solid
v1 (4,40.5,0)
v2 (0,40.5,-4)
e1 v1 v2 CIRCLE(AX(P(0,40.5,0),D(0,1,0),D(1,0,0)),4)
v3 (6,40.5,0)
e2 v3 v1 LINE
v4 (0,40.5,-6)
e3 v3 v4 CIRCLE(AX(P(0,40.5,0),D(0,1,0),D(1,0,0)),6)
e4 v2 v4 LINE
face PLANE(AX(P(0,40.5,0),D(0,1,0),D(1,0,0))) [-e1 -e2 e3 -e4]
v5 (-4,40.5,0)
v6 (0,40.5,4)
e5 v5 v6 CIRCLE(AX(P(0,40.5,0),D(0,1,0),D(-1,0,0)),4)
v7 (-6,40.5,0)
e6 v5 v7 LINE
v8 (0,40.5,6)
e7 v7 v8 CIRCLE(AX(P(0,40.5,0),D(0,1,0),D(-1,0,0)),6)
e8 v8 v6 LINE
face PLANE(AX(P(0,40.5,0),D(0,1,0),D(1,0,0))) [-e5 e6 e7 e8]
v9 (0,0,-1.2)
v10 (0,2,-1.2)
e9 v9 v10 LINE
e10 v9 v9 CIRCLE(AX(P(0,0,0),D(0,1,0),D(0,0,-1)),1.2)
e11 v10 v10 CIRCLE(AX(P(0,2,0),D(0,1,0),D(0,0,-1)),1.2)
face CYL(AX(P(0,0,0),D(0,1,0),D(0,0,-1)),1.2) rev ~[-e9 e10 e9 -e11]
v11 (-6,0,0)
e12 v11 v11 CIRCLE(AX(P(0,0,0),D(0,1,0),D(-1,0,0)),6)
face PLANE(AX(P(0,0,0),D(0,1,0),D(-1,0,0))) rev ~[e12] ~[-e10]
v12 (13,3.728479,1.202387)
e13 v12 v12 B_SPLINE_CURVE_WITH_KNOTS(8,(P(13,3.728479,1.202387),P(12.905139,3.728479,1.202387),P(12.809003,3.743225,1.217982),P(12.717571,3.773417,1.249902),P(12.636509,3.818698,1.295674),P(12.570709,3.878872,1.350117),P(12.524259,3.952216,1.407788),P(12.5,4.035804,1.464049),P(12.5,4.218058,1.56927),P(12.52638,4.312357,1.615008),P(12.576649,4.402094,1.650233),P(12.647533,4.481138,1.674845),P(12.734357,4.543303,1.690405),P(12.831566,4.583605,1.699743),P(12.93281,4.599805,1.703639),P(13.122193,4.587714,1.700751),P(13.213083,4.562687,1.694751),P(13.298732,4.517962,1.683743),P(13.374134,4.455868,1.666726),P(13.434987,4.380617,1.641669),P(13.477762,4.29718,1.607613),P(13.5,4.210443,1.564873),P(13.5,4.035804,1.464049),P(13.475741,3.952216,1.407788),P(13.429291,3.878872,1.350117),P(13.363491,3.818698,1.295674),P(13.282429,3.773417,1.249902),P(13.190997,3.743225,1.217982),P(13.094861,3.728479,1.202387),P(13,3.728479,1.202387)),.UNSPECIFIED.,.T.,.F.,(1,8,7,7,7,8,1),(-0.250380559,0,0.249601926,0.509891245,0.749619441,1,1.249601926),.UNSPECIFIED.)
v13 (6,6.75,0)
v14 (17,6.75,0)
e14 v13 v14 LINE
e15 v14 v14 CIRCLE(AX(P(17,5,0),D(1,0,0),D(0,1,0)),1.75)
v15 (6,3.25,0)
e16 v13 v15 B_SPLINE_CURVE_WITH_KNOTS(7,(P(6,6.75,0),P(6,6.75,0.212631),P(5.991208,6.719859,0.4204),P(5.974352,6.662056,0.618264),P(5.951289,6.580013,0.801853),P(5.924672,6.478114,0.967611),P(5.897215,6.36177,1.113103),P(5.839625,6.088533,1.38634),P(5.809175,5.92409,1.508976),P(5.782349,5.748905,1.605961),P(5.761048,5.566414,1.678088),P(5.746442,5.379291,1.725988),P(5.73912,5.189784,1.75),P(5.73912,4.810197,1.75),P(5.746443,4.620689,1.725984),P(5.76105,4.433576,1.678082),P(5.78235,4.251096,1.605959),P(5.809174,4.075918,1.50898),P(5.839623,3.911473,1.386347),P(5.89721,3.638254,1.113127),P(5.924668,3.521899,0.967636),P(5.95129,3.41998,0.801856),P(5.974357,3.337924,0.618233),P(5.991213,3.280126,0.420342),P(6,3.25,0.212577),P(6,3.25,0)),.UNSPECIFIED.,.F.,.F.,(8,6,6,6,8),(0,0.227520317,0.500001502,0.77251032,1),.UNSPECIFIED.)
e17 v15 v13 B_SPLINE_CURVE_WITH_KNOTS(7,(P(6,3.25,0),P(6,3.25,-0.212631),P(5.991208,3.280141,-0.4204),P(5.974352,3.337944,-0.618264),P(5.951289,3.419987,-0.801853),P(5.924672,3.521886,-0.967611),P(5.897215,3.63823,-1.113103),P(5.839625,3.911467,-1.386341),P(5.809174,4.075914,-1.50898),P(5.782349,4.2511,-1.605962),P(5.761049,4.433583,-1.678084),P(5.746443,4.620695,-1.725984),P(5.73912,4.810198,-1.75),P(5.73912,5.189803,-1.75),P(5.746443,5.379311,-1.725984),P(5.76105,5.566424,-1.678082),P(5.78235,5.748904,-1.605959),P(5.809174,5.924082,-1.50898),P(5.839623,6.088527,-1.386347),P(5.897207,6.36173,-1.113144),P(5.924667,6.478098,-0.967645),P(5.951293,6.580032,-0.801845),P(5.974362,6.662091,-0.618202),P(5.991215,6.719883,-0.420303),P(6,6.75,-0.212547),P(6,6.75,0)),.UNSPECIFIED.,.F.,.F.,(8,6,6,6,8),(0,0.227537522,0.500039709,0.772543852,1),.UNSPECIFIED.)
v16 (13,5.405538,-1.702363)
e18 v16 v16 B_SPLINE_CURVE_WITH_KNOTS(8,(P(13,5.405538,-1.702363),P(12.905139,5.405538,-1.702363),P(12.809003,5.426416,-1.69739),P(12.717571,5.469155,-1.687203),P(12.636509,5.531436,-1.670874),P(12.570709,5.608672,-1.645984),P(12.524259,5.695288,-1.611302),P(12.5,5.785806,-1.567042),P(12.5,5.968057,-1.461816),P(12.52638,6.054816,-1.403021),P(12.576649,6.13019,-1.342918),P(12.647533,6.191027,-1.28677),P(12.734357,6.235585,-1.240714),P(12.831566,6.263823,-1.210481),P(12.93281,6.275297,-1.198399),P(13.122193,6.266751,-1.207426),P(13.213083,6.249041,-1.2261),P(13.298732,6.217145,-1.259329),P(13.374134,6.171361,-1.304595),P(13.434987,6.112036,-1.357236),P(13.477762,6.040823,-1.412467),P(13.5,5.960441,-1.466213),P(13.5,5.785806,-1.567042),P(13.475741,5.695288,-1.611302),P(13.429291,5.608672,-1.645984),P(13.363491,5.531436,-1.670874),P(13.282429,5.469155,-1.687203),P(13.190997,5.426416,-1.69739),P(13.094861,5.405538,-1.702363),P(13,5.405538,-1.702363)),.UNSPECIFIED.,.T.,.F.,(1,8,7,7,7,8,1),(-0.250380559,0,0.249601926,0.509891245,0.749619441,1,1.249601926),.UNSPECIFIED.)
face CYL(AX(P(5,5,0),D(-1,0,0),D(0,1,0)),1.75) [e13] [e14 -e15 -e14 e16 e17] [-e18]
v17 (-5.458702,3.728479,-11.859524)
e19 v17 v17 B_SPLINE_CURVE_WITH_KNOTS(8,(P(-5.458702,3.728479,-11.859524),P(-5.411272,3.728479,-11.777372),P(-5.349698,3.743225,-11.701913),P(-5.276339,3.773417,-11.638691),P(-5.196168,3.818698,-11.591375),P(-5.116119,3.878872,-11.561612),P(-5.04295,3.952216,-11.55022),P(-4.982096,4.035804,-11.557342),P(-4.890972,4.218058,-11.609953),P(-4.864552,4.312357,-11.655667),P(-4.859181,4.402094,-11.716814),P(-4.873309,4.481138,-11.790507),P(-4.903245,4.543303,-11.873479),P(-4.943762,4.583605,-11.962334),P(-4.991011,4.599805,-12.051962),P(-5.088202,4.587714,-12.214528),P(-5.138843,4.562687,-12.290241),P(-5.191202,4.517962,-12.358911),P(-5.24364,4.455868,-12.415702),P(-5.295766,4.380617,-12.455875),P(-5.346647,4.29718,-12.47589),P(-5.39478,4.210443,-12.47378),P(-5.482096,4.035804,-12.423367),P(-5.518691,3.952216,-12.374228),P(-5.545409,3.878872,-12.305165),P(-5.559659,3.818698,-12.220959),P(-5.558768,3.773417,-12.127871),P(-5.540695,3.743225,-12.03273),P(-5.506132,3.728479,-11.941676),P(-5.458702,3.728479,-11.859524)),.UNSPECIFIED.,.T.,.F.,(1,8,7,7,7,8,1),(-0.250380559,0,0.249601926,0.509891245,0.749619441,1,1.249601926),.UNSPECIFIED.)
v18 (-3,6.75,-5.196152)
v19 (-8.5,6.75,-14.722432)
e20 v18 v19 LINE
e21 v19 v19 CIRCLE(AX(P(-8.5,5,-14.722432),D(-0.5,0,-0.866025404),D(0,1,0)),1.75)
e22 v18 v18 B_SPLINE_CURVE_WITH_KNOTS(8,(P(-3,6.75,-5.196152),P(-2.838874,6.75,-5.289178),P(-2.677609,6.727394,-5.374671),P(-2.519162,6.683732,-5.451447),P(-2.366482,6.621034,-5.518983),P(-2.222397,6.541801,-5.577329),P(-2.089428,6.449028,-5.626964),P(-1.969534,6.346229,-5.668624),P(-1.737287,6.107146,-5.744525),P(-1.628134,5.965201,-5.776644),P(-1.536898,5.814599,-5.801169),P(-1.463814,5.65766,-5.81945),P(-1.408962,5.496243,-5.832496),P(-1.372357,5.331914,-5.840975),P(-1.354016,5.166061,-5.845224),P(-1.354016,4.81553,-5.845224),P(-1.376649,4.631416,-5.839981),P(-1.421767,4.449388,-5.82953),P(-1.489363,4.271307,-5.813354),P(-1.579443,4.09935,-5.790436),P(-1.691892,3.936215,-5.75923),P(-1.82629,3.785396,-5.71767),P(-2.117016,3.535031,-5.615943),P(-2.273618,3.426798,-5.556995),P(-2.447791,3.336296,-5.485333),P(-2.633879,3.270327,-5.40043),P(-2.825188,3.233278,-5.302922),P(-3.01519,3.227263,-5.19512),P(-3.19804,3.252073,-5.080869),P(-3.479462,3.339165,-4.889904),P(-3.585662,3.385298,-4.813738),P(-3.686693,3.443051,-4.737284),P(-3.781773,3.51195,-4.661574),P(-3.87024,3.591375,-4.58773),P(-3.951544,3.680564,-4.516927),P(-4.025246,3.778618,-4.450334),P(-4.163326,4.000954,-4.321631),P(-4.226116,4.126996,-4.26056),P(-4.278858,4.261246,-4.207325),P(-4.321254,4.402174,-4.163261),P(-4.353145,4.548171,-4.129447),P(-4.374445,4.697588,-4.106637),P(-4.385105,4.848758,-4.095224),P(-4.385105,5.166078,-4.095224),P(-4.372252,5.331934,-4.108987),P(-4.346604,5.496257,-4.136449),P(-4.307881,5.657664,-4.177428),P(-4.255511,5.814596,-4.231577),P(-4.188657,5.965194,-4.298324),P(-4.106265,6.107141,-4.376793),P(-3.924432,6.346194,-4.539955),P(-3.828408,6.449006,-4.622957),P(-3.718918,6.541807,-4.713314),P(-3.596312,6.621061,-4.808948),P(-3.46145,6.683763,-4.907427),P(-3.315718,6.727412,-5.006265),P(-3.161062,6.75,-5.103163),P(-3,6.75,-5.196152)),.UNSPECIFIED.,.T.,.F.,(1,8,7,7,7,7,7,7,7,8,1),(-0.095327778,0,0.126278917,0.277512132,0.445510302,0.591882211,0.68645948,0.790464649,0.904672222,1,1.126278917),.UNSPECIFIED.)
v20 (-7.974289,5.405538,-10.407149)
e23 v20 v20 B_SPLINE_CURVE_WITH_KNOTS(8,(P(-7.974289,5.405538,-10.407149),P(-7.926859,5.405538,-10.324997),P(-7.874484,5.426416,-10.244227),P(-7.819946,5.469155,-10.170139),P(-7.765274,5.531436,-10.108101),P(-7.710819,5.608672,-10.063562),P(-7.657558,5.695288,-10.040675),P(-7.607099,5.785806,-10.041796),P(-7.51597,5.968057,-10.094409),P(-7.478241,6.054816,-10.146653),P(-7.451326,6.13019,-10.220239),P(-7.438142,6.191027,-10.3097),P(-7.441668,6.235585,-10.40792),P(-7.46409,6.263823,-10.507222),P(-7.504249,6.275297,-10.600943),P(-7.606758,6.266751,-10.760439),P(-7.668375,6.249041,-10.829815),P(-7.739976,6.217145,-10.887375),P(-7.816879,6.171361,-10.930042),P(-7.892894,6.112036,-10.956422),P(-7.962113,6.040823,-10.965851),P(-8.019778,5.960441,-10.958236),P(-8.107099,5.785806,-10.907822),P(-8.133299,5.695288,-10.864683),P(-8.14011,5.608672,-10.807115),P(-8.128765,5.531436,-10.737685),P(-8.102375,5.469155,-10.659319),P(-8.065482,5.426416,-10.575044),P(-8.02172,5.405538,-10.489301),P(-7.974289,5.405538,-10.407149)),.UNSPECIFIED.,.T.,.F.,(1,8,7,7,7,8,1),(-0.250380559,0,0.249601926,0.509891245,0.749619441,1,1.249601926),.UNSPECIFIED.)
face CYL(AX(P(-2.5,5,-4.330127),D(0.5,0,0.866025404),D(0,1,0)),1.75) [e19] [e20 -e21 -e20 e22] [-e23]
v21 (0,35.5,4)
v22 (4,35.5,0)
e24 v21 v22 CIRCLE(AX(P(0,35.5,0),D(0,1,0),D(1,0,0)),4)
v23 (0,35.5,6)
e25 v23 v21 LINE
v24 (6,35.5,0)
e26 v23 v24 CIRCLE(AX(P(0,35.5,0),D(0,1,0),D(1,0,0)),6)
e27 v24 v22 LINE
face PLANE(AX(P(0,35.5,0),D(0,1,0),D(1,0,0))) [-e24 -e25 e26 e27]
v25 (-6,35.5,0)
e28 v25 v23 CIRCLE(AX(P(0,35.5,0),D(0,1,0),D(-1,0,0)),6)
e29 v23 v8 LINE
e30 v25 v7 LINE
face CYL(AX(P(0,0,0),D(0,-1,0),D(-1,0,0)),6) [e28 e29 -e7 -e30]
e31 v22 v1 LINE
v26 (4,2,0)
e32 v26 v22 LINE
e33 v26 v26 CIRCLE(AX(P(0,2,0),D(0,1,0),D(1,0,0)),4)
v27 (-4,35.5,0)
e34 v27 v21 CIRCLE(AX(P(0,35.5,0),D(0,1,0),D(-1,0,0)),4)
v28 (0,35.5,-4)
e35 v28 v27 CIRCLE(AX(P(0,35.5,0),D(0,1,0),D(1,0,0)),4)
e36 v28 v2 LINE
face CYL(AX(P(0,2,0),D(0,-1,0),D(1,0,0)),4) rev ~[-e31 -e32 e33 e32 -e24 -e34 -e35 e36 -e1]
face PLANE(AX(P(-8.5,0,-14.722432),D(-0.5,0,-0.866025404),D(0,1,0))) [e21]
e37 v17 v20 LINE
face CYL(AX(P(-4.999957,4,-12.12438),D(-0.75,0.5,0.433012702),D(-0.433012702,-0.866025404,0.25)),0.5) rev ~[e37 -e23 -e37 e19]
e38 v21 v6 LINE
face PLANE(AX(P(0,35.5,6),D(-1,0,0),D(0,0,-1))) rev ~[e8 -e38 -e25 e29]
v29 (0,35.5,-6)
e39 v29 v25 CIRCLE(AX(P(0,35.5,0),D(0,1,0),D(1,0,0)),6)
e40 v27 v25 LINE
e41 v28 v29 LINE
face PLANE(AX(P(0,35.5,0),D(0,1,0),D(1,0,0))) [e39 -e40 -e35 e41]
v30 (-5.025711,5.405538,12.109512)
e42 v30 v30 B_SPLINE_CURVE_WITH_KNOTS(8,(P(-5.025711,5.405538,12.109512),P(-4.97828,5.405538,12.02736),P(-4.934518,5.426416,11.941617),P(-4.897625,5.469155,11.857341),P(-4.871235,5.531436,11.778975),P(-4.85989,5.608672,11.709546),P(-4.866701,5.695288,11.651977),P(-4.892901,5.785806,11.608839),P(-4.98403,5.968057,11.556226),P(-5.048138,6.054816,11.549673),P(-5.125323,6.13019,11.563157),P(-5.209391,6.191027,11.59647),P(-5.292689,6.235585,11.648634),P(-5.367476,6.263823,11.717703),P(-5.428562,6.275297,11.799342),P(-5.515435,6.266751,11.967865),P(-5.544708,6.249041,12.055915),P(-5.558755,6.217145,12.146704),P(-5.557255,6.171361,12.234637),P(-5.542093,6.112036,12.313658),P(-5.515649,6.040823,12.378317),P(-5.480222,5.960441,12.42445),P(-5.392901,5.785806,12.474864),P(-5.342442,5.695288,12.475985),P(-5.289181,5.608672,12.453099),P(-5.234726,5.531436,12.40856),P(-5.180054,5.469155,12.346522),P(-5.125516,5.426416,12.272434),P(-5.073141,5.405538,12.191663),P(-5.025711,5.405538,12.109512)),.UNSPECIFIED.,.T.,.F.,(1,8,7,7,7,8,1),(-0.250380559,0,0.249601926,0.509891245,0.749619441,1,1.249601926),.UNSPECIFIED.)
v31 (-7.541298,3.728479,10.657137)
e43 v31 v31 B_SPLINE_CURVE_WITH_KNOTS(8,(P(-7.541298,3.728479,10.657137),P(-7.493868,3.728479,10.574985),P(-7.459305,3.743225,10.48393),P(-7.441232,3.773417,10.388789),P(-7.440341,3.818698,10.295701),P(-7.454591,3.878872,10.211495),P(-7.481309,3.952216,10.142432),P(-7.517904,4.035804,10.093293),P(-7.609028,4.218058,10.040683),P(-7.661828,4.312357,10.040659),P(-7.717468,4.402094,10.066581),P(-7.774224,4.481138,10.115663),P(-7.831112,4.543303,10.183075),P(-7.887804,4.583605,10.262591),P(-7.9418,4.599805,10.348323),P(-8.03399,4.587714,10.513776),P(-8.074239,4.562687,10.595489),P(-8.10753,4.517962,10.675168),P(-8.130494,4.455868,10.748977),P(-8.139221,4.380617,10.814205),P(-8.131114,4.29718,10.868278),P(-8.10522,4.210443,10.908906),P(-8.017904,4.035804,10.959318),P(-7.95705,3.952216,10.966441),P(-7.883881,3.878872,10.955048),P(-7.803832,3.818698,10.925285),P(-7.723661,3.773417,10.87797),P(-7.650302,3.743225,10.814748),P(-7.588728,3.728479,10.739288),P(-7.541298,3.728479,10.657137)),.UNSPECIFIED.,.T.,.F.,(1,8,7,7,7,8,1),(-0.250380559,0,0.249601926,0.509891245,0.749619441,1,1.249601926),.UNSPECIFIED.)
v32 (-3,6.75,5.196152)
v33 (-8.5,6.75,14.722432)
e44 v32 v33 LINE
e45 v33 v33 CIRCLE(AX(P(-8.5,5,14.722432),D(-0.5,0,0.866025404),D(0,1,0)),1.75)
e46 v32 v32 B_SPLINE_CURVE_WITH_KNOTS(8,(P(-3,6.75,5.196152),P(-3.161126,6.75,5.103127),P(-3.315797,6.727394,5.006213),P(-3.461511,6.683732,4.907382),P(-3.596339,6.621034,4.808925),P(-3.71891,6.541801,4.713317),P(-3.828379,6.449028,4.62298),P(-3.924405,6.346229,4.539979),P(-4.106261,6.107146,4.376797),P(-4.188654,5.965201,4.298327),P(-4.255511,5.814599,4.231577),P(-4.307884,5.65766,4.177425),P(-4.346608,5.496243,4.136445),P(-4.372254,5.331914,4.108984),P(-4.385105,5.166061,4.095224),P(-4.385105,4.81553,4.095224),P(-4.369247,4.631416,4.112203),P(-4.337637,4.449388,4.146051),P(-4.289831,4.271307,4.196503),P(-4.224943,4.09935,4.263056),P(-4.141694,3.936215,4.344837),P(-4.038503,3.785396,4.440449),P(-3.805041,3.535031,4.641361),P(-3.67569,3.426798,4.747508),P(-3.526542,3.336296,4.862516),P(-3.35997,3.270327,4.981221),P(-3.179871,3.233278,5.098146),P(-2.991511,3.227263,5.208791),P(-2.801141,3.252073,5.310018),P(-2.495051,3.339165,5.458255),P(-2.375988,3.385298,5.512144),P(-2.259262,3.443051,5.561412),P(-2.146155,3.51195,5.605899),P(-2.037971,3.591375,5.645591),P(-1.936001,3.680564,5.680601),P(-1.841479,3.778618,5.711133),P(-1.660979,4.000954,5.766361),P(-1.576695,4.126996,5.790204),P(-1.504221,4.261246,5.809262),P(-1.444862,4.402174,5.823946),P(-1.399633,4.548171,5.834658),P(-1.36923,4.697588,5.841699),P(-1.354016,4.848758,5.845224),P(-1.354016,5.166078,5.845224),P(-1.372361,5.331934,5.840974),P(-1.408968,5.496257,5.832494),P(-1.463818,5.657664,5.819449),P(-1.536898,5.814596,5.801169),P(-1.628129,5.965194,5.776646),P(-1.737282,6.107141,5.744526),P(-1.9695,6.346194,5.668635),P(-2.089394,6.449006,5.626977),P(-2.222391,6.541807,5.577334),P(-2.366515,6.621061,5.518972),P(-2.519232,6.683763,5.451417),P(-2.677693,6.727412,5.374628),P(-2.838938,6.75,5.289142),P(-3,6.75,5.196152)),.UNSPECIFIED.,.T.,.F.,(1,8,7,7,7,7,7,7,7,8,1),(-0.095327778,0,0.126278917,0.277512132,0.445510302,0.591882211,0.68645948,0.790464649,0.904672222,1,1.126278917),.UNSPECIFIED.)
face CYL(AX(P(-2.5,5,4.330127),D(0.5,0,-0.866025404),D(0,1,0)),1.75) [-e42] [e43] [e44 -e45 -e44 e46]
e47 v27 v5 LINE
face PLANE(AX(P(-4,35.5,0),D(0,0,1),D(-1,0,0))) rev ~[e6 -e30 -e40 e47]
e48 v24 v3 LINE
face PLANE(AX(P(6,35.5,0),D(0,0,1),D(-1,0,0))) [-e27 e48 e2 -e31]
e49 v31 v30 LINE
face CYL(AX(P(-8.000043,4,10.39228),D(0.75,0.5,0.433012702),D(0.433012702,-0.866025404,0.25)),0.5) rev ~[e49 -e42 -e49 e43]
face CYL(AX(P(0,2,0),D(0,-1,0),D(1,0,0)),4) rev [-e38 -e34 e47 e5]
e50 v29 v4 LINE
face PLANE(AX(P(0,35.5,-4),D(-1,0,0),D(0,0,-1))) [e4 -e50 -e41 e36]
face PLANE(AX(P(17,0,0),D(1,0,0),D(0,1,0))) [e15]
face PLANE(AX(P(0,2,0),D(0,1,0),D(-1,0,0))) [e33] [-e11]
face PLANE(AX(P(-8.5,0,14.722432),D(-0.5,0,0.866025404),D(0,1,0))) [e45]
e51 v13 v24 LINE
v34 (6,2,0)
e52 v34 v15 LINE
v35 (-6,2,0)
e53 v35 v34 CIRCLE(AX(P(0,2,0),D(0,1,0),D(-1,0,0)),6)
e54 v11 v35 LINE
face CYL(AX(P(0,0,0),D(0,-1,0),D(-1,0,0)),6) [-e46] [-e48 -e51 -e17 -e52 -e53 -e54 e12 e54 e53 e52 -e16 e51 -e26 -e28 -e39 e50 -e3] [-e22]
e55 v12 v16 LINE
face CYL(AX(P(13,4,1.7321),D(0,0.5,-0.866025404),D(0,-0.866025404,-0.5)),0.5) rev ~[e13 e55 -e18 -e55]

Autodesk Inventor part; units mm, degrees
sketch "Sketch1" plane through (0, 0, 0) normal (0, 1, 0) x (-1, 0, 0)
  circle A0 centre (0, 0) radius 6
  dimension "d0" = 12
extrude "Extrusion1" add sketch "Sketch1" along normal blind 2
sketch "Sketch2" plane through (0, 2, 0) normal (0, 1, 0) x (1, 0, 0)
  circle A0 centre (0, 0) radius 4
  circle A1 centre (0, 0) radius 6
  dimension "d3" = 8
extrude "Extrusion2" add sketch "Sketch2" along normal blind 33.5
sketch "Sketch3" plane through (0, 35.5, 0) normal (0, 1, 0) x (1, 0, 0)
  arc A0 (-6, 0) -> (0, -6) centre (0, 0) ccw
  circle A1 centre (0, 0) radius 6 construction
  arc A2 (6, 0) -> (0, 6) centre (0, 0) ccw
  line L0 (0, -6) -> (0, -4)
  circle A3 centre (0, 0) radius 4 construction
  line L1 (0, 4) -> (0, 6)
  line L2 (6, 0) -> (4, 0)
  line L3 (-4, 0) -> (-6, 0)
  arc A4 (-4, 0) -> (0, -4) centre (0, 0) ccw
  arc A5 (4, 0) -> (0, 4) centre (0, 0) ccw
extrude "Extrusion3" add sketch "Sketch3" along normal blind 5
ref_plane "Work Plane1" through (5, 0, 0) normal (1, 0, 0) x (0, 1, 0)
sketch "Sketch5" plane through (5, 0, 0) normal (1, 0, 0) x (0, 1, 0)
  line L0 (35.5, 0) -> (35.5, 6) construction
  line L1 (35.5, -6) -> (35.5, 0) construction
  circle A0 centre (5, 0) radius 1.75
  line L2 (0, 6) -> (0, -6) projected
  line L3 (44.4345, 0) -> (-10, 0) construction
  point P0 (0, 0)
  point P1 (0, 0)
  dimension "d10" = 3.5
  dimension "d44" = 5
extrude "Extrusion4" add sketch "Sketch5" along normal blind 12
pattern_circular "Circular Pattern1" count 3 over 360 about axis through (0, 0, 0) along (0, 1, 0) of "Extrusion4"
thread "Thread1" size "M3.5x0.6" class "6g" standard "ANSI Metric M Profile" length 10
thread "Thread2" size "M3.5x0.6" class "6g" standard "ANSI Metric M Profile" length 10
thread "Thread3" size "M3.5x0.6" class "6g" standard "ANSI Metric M Profile" length 10
ref_plane "Work Plane3" through (13, 5, 0) normal (1, 0, 0) x (0, 0, -1)
sketch "Sketch7" plane through (13, 5, 0) normal (1, 0, 0) x (0, 0, -1)
  circle A0 centre (0, 0) radius 1.75 construction
  arc A1 (0, 6.6281) -> (-5.7401, -3.3141) centre (0, 0) ccw construction
  line L0 (0, 0) -> (-5.7401, -3.3141) construction
  line L1 (0, 0) -> (0, 6.6281) construction
  point P0 (0, -12)
  dimension "d23" = 120
sketch "Sketch8" plane through (0, 0, 0) normal (0, -1, 0) x (1, 0, 0)
  point P0 (0, 0)
  point P1 (0, 0)
hole "Hole1" at (0, 0, 0) direction (0, 1, 0) diameter 2.4 end through all
ref_plane "Work Plane5" through (13, 4, 1.7321) normal (0, -0.5, 0.8660254) x (1, 0, 0)
ref_plane "Work Plane4" through (13, 5, 0) normal (0, -0.5, 0.8660254) x (1, 0, 0)
sketch "Sketch10" plane through (13, 4, 1.7321) normal (0, -0.5, 0.8660254) x (1, 0, 0)
  line L0 (-7, -4.3301) -> (-7, 30.7439) construction
  line L1 (-7, 1.7737) -> (-7, -1.9186) construction
  point P0 (-13, -4.3301)
  point P1 (0, 0)
  dimension "d33" = 7
hole "Hole2" at (13, 4, 1.7321) direction (0, 0.5, -0.8660254) diameter 1 end through all
pattern_circular "Circular Pattern2" count 3 over 360 about axis through (0, 0, 0) along (0, 1, 0) of "Hole2"
properties part number "UntererRührerHalter"
